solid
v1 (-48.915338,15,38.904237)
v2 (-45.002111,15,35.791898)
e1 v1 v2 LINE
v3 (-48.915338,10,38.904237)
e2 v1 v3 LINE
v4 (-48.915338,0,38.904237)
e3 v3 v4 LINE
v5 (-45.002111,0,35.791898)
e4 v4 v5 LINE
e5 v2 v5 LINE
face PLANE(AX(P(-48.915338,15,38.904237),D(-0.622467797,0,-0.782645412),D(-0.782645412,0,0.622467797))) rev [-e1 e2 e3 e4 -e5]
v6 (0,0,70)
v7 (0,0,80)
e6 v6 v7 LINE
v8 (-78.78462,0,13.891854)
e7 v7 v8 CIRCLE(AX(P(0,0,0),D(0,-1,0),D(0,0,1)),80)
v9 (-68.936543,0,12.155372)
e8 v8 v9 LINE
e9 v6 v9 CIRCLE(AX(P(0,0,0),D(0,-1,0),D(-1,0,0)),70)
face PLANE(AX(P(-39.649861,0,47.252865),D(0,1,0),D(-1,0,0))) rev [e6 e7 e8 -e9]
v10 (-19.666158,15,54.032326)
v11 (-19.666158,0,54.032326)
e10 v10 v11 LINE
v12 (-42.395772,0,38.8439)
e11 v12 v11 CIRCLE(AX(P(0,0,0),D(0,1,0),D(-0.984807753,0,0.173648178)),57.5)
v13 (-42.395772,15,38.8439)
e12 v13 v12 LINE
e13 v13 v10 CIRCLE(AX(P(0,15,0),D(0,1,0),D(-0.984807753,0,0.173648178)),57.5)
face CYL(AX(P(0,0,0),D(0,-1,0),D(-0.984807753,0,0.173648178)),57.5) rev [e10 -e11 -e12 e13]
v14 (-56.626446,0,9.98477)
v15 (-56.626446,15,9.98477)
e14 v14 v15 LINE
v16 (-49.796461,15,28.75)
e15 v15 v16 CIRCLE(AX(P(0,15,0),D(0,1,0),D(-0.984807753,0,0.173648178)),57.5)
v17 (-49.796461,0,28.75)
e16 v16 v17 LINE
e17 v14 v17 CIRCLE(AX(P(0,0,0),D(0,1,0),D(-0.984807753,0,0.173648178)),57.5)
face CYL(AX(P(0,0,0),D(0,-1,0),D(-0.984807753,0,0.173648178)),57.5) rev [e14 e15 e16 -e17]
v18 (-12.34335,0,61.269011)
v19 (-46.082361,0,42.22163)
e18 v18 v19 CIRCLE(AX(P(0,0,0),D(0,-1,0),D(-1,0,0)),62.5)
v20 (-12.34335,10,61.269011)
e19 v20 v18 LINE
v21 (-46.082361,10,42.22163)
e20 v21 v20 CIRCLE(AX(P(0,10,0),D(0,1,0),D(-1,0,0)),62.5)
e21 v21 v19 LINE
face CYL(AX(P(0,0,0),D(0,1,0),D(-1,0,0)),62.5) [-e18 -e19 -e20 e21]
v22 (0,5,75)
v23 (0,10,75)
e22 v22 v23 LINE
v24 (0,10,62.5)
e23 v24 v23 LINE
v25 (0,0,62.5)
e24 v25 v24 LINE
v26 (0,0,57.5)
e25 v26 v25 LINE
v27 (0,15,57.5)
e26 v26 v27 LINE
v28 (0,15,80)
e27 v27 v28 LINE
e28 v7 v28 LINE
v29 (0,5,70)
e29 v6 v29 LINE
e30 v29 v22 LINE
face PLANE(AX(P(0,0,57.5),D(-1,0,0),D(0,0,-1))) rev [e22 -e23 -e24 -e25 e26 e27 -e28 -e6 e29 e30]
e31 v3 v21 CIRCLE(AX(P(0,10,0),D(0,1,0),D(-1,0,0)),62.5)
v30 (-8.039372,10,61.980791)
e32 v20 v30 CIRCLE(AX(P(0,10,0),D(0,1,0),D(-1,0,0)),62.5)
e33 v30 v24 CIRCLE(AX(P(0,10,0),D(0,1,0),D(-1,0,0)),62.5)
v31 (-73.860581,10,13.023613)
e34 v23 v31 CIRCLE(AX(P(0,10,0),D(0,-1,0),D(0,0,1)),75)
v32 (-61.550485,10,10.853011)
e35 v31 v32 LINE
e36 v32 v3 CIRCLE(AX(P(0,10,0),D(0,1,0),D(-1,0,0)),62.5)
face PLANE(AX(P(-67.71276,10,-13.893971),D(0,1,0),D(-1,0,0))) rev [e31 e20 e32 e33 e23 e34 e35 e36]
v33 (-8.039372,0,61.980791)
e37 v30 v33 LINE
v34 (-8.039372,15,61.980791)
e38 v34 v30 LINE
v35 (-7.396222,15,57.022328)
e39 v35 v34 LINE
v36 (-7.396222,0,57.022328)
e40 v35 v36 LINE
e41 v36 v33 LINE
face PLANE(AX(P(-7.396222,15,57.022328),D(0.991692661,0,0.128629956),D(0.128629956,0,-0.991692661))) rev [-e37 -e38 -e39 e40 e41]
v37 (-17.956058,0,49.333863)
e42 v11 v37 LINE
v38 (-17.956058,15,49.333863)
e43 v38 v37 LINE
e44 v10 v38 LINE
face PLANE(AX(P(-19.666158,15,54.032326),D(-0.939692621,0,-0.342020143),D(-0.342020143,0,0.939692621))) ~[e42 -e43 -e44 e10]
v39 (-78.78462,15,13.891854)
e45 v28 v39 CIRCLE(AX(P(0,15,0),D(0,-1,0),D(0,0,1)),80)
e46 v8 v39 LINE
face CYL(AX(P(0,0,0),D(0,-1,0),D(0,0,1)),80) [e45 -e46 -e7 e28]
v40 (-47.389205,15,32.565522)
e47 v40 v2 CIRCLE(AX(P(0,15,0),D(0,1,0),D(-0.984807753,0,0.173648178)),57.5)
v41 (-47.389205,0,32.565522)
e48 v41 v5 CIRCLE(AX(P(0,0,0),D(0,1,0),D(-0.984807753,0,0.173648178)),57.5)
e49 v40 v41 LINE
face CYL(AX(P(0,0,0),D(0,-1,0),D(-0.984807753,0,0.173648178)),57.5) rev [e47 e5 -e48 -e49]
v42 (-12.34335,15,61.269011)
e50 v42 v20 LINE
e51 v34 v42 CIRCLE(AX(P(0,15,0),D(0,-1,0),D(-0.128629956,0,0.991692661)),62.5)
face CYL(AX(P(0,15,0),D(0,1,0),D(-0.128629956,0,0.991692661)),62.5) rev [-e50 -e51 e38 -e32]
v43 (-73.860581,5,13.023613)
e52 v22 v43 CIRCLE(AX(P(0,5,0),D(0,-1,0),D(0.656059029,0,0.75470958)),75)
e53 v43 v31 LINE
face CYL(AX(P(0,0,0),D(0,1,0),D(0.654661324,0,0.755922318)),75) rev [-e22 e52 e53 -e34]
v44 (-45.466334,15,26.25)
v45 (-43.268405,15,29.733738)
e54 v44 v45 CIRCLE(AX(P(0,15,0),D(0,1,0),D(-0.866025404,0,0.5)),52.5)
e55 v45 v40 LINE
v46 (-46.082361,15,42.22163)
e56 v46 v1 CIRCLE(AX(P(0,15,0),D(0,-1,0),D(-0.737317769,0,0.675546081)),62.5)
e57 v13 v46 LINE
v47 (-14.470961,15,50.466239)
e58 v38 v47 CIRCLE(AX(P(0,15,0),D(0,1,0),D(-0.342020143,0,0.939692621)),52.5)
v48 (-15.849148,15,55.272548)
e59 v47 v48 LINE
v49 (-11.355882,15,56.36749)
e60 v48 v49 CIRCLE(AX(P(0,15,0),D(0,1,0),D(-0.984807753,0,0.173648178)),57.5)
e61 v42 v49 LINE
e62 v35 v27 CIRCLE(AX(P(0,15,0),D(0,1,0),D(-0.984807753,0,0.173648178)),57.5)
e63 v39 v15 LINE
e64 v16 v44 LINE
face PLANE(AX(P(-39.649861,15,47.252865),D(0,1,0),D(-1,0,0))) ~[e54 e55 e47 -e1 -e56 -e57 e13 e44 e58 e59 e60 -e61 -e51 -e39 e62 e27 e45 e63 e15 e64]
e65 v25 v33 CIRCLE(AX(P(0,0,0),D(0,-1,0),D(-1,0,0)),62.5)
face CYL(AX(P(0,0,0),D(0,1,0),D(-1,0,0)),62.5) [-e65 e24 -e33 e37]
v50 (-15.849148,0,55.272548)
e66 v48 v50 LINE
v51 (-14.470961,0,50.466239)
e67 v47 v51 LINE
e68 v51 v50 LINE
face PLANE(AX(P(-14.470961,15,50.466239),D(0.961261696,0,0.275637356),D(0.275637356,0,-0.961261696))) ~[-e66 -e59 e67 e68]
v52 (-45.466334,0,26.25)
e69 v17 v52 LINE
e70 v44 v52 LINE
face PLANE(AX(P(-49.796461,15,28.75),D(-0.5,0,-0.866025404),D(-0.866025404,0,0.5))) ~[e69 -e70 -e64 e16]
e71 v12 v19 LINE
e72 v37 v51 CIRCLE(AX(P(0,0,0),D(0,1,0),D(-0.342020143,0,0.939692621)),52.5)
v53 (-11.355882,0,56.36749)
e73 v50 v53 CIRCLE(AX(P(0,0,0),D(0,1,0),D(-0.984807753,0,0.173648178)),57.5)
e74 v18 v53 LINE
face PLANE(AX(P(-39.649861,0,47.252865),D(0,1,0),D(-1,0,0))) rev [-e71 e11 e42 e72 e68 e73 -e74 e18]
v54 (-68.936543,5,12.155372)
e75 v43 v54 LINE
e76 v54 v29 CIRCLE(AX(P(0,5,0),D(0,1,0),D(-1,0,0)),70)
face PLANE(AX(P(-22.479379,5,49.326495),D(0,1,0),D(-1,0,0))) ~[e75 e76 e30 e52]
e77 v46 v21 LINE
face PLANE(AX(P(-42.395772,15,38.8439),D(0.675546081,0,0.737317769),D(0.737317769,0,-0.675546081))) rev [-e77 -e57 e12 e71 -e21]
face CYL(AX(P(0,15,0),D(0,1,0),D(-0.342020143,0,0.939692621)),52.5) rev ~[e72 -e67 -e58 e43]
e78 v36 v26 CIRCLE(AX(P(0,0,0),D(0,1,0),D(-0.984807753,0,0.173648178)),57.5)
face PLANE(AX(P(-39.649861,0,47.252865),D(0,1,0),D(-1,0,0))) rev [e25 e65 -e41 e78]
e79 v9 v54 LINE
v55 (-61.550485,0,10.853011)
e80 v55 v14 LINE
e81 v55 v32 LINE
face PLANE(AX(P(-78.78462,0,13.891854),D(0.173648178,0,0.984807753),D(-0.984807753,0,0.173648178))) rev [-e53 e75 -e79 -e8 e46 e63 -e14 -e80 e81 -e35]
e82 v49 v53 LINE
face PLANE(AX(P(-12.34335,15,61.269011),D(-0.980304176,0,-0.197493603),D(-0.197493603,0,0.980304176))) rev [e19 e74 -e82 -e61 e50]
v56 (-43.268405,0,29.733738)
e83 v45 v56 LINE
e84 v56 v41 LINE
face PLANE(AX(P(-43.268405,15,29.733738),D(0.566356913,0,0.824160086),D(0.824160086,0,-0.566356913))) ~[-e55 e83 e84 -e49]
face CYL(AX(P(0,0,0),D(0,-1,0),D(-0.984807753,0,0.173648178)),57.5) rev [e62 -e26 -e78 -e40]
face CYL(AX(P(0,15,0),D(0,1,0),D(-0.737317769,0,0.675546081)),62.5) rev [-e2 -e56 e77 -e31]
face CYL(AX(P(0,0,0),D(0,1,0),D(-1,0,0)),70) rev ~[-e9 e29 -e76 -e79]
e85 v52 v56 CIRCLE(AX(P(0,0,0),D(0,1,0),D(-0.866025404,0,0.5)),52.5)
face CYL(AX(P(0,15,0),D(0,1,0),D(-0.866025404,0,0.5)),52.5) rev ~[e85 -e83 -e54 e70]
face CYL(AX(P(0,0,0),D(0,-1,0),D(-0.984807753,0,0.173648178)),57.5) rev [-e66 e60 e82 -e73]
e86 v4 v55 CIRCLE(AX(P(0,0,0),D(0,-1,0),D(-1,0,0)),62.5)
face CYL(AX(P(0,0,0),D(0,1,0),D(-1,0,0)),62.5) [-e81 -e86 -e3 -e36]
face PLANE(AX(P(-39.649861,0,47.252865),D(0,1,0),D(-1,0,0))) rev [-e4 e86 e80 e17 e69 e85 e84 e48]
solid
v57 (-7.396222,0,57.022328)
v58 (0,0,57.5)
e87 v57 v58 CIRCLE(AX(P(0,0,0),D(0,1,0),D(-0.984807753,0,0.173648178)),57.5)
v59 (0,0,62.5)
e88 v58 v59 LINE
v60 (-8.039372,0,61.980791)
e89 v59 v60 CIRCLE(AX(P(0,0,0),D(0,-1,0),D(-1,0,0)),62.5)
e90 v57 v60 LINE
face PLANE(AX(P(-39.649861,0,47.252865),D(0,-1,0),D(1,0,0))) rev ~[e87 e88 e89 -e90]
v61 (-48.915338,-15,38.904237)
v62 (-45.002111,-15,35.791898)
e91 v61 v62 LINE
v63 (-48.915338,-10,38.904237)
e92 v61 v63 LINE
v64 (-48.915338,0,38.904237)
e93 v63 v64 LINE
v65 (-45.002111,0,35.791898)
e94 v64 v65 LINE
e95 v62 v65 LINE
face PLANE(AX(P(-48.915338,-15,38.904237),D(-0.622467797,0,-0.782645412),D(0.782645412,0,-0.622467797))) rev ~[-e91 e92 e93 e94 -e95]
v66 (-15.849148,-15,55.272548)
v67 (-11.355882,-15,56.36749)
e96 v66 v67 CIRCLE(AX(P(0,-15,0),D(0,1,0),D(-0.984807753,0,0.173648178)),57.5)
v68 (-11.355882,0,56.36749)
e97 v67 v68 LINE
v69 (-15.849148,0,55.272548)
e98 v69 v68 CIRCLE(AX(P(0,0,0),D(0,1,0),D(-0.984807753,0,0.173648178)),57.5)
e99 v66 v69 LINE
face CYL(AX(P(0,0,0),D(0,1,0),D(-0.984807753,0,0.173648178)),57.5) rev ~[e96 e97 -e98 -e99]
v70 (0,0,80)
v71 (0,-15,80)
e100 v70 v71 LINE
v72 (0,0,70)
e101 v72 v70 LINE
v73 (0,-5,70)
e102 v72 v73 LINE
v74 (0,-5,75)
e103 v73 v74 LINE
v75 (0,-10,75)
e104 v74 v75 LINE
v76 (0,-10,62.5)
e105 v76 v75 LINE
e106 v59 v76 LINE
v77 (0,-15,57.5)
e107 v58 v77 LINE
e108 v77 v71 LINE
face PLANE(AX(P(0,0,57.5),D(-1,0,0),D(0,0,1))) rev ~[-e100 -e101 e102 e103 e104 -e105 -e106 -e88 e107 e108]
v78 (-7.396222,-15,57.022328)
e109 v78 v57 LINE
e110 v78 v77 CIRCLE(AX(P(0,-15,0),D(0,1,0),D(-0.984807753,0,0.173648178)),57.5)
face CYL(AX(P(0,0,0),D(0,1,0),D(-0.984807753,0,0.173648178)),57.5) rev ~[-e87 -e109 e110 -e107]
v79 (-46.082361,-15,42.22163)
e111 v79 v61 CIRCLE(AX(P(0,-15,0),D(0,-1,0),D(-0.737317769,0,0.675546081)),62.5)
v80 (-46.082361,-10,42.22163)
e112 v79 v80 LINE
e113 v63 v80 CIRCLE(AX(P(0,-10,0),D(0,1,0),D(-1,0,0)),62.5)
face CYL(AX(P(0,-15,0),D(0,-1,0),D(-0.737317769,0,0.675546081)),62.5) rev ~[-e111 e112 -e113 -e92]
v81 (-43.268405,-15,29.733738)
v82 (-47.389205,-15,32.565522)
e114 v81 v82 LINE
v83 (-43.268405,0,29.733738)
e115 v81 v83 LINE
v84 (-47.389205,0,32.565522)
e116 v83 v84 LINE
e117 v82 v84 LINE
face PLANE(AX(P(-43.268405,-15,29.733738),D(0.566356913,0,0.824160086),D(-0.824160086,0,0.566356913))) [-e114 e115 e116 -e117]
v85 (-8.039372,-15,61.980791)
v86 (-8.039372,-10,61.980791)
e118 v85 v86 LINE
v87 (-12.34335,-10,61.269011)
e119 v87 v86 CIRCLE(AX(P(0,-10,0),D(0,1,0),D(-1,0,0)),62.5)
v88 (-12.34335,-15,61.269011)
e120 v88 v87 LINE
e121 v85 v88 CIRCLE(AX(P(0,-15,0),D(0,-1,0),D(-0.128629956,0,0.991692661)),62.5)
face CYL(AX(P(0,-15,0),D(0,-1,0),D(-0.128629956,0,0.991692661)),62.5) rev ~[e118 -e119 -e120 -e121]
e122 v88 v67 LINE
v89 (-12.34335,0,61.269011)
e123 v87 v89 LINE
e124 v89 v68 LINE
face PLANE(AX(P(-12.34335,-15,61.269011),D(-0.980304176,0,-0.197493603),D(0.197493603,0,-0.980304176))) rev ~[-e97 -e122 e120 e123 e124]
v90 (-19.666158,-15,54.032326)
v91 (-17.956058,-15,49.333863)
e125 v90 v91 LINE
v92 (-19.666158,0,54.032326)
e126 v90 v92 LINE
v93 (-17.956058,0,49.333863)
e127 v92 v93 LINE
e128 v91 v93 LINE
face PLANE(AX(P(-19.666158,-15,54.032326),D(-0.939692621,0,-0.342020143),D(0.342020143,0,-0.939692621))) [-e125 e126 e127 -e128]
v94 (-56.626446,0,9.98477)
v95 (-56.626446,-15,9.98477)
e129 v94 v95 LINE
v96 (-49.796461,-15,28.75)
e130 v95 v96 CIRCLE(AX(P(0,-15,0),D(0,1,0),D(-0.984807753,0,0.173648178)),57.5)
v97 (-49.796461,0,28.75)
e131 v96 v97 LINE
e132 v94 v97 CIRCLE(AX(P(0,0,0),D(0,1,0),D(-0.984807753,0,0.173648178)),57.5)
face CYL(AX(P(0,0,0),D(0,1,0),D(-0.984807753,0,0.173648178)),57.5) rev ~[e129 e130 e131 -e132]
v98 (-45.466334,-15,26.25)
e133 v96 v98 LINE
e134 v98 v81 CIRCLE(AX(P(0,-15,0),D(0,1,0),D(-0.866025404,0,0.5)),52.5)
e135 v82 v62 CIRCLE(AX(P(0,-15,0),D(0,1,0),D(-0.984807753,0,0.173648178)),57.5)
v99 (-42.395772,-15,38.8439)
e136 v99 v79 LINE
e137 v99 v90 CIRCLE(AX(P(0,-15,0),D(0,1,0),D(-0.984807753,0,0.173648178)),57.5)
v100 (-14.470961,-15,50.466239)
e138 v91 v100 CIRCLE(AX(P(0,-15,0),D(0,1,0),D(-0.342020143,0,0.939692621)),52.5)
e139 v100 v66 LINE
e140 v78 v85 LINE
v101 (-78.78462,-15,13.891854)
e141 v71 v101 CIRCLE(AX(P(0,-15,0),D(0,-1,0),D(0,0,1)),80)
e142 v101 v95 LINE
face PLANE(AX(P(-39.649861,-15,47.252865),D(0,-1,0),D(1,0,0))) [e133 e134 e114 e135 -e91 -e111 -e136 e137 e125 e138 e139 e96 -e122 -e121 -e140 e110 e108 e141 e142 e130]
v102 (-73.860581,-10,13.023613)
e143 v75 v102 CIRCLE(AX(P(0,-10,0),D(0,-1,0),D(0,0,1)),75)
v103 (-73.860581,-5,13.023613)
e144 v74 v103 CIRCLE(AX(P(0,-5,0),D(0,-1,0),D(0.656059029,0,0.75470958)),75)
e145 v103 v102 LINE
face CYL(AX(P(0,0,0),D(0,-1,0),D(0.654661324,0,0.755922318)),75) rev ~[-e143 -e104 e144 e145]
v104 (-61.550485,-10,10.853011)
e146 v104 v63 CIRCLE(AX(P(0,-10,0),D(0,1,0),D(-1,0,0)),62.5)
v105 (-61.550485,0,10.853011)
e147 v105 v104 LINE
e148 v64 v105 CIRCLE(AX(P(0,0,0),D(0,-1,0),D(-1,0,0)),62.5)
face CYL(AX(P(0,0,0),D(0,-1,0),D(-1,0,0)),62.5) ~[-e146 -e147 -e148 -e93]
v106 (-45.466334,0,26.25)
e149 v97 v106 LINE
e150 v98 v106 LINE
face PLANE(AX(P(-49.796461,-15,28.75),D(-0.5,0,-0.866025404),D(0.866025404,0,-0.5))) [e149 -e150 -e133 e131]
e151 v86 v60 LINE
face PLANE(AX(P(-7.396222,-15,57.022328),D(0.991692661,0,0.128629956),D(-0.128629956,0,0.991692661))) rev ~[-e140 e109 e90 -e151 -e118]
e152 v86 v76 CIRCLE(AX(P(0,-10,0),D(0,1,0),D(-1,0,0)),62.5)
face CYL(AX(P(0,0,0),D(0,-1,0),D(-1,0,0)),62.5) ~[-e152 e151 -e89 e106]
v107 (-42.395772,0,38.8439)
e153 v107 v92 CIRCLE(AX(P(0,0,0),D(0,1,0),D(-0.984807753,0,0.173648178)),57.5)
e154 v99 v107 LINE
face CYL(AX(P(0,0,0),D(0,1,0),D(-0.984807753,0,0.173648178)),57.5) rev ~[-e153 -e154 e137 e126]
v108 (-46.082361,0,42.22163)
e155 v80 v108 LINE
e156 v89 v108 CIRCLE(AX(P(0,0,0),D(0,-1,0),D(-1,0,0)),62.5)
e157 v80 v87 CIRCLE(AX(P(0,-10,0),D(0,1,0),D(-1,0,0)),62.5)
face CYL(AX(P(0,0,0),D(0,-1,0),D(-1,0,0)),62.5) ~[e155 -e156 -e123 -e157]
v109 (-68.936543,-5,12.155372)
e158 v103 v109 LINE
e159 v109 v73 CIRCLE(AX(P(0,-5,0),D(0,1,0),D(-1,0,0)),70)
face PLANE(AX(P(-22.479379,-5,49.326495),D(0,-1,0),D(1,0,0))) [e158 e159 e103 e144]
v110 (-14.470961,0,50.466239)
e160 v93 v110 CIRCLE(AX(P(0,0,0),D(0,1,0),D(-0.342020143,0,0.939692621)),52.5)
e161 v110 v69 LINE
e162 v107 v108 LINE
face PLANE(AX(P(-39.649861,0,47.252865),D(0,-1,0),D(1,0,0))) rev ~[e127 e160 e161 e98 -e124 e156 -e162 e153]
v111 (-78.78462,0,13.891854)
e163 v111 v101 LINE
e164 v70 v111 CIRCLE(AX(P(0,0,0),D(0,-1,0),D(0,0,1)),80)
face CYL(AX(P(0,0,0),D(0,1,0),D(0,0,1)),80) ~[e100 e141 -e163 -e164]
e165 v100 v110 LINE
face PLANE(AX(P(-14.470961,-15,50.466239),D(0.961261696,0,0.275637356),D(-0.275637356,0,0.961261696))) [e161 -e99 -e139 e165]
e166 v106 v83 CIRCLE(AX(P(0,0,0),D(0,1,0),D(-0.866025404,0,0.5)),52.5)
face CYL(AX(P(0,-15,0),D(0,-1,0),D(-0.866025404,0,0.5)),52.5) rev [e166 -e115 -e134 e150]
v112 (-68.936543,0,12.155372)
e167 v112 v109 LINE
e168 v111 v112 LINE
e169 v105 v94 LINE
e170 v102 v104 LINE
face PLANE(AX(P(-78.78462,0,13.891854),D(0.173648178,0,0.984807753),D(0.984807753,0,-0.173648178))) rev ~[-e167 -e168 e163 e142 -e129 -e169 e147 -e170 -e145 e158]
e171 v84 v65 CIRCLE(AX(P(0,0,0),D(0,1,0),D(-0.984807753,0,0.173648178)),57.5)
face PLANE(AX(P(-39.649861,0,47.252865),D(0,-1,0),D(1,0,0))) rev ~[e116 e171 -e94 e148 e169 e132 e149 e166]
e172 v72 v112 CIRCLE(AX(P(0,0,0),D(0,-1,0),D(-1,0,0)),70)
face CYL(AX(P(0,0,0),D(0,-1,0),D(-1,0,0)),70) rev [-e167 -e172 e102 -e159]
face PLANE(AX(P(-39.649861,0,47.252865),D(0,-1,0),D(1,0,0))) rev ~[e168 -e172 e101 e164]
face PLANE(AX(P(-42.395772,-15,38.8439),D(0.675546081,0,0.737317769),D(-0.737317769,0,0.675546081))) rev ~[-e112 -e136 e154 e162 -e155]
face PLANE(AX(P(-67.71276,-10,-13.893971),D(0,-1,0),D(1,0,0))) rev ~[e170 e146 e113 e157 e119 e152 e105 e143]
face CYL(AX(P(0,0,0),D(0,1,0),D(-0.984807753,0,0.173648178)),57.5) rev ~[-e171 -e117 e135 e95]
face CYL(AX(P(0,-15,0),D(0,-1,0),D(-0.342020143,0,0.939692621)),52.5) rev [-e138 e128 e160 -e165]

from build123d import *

# Parameters (mm, degrees)
F1_DEPTH = 10
F3_DEPTH = 5
F5_DEPTH = 15
F8_DEPTH = 15
F9_DEPTH = 25


# Not quite as in the source:
# - a feature names something its author has since deleted; it is built from what else it names


with BuildPart() as f1:
    # F0 (on Front) → F1 (new body, symmetric)
    with BuildSketch(Plane.XZ):
        with BuildLine():
            Line((-62.5, -30), (-62.5, 0))
            Line((-62.5, 0), (-75, 0))
            ThreePointArc((-75, 0), (-73.4179734698, -15.3232232767), (-68.7386354243, -30))
            Line((-68.7386354243, -30), (-62.5, -30))
        make_face()
        with BuildLine():
            ThreePointArc((-68.7386354243, -30), (-73.4179734698, -15.3232232767), (-75, 0))
            Line((-75, 0), (-75, -30))
            Line((-75, -30), (-68.7386354243, -30))
        make_face()
        with BuildLine():
            Line((-75, 0), (-62.5, 0))
            ThreePointArc((-62.5, 0), (-44.1941738242, 44.1941738242), (0, 62.5))
            Line((0, 62.5), (0, 75))
            ThreePointArc((0, 75), (-53.033008589, 53.033008589), (-75, 0))
        make_face()
        with BuildLine():
            ThreePointArc((0, 62.5), (23.9177145228, 57.742470782), (44.1941738242, 44.1941738242))
            Line((44.1941738242, 44.1941738242), (44.1941738242, 56.6941738242))
            Line((44.1941738242, 56.6941738242), (49.0995993303, 56.6941738242))
            ThreePointArc((49.0995993303, 56.6941738242), (26.2005435362, 70.274686185), (0, 75))
            Line((0, 75), (0, 62.5))
        make_face()
        with BuildLine():
            Line((44.1941738242, 56.6941738242), (44.1941738242, 44.1941738242))
            Line((44.1941738242, 44.1941738242), (53.033008589, 53.033008589))
            ThreePointArc((53.033008589, 53.033008589), (51.0991040315, 54.8988302897), (49.0995993303, 56.6941738242))
            Line((49.0995993303, 56.6941738242), (44.1941738242, 56.6941738242))
        make_face()
        with BuildLine():
            ThreePointArc((49.0995993303, 56.6941738242), (51.0991040315, 54.8988302897), (53.033008589, 53.033008589))
            ThreePointArc((53.033008589, 53.033008589), (56.9861303035, 48.7604445533), (60.5959982177, 44.1941738242))
            Line((60.5959982177, 44.1941738242), (79.1941738242, 44.1941738242))
            Line((79.1941738242, 44.1941738242), (79.1941738242, 56.6941738242))
            Line((79.1941738242, 56.6941738242), (49.0995993303, 56.6941738242))
        make_face()
        with BuildLine():
            Line((53.033008589, 53.033008589), (44.1941738242, 44.1941738242))
            Line((44.1941738242, 44.1941738242), (60.5959982177, 44.1941738242))
            ThreePointArc((60.5959982177, 44.1941738242), (56.9861303035, 48.7604445533), (53.033008589, 53.033008589))
        make_face()
    extrude(amount=F1_DEPTH, both=True)

    # F2 (on Front) → F3 (cut, symmetric)
    with BuildSketch(Plane.XZ):
        with BuildLine():
            Line((45.9241320293, 52.8296706156), (49.2044271743, 56.6032185167))
            ThreePointArc((49.2044271743, 56.6032185167), (-31.1019931992, 68.2470953157), (-75, 0))
            Line((-75, 0), (-70, 0))
            ThreePointArc((-70, 0), (-29.0285269859, 63.6972889614), (45.9241320293, 52.8296706156))
        make_face()
    extrude(amount=F3_DEPTH, both=True, mode=Mode.SUBTRACT)


with BuildPart() as f5:
    # F4 (on Front) → F5 (new body)
    with BuildSketch(Plane.XZ):
        with BuildLine():
            ThreePointArc((-56.6264457982, 9.9847702158), (-36.960287557, 44.0475554793), (0, 57.5))
            Line((0, 57.5), (0, 80))
            ThreePointArc((0, 80), (-51.4230087749, 61.2835554495), (-78.784620241, 13.8918542134))
            Line((-78.784620241, 13.8918542134), (-56.6264457982, 9.9847702158))
        make_face()
    extrude(amount=F5_DEPTH)

    # F6: cut F1
    add(f1.part, mode=Mode.SUBTRACT)

    # F7 (on face) → F8 (join, through all)
    with BuildSketch(Plane.XZ.offset(15)):
        with BuildLine():
            ThreePointArc((-47.389204942, 32.5655224887), (-48.6302678935, 30.6813794443), (-49.7964607176, 28.75))
            Line((-49.7964607176, 28.75), (-45.4663336987, 26.25))
            ThreePointArc((-45.4663336987, 26.25), (-44.4015489462, 28.0134334057), (-43.2684045123, 29.7337379245))
            Line((-43.2684045123, 29.7337379245), (-47.389204942, 32.5655224887))
        make_face()
        with BuildLine():
            Line((-14.4709611804, 50.4662390368), (-15.8491479595, 55.2725475165))
            ThreePointArc((-15.8491479595, 55.2725475165), (-17.7684771766, 54.685749687), (-19.6661582412, 54.0323256952))
            Line((-19.6661582412, 54.0323256952), (-17.9560575246, 49.3338625913))
            ThreePointArc((-17.9560575246, 49.3338625913), (-16.2233922047, 49.9304671055), (-14.4709611804, 50.4662390368))
        make_face()
    extrude(amount=-F8_DEPTH)

    # F7 (on face) → F9 (cut)
    with BuildSketch(Plane.XZ.offset(15)):
        with BuildLine():
            Line((-48.9153382675, 38.9042373293), (-45.0021112061, 35.7918983429))
            ThreePointArc((-45.0021112061, 35.7918983429), (-43.7255778977, 37.3406459172), (-42.395771708, 38.8438996663))
            Line((-42.395771708, 38.8438996663), (-46.0823605522, 42.221630072))
            ThreePointArc((-46.0823605522, 42.221630072), (-47.5278020627, 40.5876586056), (-48.9153382675, 38.9042373293))
        make_face()
        with BuildLine():
            ThreePointArc((-11.3558821654, 56.3674901006), (-9.3817674339, 56.7294671209), (-7.396222464, 57.0223280239))
            Line((-7.396222464, 57.0223280239), (-8.0393722435, 61.9807913303))
            ThreePointArc((-8.0393722435, 61.9807913303), (-10.1975732978, 61.6624642618), (-12.3433501798, 61.269010979))
            Line((-12.3433501798, 61.269010979), (-11.3558821654, 56.3674901006))
        make_face()
    extrude(amount=-F9_DEPTH, mode=Mode.SUBTRACT)


with BuildPart() as f10_1:
    # F10: instance of F5
    add(f5.part.mirror(Plane.XZ))


solid = Compound([f5.part, f10_1.part])
